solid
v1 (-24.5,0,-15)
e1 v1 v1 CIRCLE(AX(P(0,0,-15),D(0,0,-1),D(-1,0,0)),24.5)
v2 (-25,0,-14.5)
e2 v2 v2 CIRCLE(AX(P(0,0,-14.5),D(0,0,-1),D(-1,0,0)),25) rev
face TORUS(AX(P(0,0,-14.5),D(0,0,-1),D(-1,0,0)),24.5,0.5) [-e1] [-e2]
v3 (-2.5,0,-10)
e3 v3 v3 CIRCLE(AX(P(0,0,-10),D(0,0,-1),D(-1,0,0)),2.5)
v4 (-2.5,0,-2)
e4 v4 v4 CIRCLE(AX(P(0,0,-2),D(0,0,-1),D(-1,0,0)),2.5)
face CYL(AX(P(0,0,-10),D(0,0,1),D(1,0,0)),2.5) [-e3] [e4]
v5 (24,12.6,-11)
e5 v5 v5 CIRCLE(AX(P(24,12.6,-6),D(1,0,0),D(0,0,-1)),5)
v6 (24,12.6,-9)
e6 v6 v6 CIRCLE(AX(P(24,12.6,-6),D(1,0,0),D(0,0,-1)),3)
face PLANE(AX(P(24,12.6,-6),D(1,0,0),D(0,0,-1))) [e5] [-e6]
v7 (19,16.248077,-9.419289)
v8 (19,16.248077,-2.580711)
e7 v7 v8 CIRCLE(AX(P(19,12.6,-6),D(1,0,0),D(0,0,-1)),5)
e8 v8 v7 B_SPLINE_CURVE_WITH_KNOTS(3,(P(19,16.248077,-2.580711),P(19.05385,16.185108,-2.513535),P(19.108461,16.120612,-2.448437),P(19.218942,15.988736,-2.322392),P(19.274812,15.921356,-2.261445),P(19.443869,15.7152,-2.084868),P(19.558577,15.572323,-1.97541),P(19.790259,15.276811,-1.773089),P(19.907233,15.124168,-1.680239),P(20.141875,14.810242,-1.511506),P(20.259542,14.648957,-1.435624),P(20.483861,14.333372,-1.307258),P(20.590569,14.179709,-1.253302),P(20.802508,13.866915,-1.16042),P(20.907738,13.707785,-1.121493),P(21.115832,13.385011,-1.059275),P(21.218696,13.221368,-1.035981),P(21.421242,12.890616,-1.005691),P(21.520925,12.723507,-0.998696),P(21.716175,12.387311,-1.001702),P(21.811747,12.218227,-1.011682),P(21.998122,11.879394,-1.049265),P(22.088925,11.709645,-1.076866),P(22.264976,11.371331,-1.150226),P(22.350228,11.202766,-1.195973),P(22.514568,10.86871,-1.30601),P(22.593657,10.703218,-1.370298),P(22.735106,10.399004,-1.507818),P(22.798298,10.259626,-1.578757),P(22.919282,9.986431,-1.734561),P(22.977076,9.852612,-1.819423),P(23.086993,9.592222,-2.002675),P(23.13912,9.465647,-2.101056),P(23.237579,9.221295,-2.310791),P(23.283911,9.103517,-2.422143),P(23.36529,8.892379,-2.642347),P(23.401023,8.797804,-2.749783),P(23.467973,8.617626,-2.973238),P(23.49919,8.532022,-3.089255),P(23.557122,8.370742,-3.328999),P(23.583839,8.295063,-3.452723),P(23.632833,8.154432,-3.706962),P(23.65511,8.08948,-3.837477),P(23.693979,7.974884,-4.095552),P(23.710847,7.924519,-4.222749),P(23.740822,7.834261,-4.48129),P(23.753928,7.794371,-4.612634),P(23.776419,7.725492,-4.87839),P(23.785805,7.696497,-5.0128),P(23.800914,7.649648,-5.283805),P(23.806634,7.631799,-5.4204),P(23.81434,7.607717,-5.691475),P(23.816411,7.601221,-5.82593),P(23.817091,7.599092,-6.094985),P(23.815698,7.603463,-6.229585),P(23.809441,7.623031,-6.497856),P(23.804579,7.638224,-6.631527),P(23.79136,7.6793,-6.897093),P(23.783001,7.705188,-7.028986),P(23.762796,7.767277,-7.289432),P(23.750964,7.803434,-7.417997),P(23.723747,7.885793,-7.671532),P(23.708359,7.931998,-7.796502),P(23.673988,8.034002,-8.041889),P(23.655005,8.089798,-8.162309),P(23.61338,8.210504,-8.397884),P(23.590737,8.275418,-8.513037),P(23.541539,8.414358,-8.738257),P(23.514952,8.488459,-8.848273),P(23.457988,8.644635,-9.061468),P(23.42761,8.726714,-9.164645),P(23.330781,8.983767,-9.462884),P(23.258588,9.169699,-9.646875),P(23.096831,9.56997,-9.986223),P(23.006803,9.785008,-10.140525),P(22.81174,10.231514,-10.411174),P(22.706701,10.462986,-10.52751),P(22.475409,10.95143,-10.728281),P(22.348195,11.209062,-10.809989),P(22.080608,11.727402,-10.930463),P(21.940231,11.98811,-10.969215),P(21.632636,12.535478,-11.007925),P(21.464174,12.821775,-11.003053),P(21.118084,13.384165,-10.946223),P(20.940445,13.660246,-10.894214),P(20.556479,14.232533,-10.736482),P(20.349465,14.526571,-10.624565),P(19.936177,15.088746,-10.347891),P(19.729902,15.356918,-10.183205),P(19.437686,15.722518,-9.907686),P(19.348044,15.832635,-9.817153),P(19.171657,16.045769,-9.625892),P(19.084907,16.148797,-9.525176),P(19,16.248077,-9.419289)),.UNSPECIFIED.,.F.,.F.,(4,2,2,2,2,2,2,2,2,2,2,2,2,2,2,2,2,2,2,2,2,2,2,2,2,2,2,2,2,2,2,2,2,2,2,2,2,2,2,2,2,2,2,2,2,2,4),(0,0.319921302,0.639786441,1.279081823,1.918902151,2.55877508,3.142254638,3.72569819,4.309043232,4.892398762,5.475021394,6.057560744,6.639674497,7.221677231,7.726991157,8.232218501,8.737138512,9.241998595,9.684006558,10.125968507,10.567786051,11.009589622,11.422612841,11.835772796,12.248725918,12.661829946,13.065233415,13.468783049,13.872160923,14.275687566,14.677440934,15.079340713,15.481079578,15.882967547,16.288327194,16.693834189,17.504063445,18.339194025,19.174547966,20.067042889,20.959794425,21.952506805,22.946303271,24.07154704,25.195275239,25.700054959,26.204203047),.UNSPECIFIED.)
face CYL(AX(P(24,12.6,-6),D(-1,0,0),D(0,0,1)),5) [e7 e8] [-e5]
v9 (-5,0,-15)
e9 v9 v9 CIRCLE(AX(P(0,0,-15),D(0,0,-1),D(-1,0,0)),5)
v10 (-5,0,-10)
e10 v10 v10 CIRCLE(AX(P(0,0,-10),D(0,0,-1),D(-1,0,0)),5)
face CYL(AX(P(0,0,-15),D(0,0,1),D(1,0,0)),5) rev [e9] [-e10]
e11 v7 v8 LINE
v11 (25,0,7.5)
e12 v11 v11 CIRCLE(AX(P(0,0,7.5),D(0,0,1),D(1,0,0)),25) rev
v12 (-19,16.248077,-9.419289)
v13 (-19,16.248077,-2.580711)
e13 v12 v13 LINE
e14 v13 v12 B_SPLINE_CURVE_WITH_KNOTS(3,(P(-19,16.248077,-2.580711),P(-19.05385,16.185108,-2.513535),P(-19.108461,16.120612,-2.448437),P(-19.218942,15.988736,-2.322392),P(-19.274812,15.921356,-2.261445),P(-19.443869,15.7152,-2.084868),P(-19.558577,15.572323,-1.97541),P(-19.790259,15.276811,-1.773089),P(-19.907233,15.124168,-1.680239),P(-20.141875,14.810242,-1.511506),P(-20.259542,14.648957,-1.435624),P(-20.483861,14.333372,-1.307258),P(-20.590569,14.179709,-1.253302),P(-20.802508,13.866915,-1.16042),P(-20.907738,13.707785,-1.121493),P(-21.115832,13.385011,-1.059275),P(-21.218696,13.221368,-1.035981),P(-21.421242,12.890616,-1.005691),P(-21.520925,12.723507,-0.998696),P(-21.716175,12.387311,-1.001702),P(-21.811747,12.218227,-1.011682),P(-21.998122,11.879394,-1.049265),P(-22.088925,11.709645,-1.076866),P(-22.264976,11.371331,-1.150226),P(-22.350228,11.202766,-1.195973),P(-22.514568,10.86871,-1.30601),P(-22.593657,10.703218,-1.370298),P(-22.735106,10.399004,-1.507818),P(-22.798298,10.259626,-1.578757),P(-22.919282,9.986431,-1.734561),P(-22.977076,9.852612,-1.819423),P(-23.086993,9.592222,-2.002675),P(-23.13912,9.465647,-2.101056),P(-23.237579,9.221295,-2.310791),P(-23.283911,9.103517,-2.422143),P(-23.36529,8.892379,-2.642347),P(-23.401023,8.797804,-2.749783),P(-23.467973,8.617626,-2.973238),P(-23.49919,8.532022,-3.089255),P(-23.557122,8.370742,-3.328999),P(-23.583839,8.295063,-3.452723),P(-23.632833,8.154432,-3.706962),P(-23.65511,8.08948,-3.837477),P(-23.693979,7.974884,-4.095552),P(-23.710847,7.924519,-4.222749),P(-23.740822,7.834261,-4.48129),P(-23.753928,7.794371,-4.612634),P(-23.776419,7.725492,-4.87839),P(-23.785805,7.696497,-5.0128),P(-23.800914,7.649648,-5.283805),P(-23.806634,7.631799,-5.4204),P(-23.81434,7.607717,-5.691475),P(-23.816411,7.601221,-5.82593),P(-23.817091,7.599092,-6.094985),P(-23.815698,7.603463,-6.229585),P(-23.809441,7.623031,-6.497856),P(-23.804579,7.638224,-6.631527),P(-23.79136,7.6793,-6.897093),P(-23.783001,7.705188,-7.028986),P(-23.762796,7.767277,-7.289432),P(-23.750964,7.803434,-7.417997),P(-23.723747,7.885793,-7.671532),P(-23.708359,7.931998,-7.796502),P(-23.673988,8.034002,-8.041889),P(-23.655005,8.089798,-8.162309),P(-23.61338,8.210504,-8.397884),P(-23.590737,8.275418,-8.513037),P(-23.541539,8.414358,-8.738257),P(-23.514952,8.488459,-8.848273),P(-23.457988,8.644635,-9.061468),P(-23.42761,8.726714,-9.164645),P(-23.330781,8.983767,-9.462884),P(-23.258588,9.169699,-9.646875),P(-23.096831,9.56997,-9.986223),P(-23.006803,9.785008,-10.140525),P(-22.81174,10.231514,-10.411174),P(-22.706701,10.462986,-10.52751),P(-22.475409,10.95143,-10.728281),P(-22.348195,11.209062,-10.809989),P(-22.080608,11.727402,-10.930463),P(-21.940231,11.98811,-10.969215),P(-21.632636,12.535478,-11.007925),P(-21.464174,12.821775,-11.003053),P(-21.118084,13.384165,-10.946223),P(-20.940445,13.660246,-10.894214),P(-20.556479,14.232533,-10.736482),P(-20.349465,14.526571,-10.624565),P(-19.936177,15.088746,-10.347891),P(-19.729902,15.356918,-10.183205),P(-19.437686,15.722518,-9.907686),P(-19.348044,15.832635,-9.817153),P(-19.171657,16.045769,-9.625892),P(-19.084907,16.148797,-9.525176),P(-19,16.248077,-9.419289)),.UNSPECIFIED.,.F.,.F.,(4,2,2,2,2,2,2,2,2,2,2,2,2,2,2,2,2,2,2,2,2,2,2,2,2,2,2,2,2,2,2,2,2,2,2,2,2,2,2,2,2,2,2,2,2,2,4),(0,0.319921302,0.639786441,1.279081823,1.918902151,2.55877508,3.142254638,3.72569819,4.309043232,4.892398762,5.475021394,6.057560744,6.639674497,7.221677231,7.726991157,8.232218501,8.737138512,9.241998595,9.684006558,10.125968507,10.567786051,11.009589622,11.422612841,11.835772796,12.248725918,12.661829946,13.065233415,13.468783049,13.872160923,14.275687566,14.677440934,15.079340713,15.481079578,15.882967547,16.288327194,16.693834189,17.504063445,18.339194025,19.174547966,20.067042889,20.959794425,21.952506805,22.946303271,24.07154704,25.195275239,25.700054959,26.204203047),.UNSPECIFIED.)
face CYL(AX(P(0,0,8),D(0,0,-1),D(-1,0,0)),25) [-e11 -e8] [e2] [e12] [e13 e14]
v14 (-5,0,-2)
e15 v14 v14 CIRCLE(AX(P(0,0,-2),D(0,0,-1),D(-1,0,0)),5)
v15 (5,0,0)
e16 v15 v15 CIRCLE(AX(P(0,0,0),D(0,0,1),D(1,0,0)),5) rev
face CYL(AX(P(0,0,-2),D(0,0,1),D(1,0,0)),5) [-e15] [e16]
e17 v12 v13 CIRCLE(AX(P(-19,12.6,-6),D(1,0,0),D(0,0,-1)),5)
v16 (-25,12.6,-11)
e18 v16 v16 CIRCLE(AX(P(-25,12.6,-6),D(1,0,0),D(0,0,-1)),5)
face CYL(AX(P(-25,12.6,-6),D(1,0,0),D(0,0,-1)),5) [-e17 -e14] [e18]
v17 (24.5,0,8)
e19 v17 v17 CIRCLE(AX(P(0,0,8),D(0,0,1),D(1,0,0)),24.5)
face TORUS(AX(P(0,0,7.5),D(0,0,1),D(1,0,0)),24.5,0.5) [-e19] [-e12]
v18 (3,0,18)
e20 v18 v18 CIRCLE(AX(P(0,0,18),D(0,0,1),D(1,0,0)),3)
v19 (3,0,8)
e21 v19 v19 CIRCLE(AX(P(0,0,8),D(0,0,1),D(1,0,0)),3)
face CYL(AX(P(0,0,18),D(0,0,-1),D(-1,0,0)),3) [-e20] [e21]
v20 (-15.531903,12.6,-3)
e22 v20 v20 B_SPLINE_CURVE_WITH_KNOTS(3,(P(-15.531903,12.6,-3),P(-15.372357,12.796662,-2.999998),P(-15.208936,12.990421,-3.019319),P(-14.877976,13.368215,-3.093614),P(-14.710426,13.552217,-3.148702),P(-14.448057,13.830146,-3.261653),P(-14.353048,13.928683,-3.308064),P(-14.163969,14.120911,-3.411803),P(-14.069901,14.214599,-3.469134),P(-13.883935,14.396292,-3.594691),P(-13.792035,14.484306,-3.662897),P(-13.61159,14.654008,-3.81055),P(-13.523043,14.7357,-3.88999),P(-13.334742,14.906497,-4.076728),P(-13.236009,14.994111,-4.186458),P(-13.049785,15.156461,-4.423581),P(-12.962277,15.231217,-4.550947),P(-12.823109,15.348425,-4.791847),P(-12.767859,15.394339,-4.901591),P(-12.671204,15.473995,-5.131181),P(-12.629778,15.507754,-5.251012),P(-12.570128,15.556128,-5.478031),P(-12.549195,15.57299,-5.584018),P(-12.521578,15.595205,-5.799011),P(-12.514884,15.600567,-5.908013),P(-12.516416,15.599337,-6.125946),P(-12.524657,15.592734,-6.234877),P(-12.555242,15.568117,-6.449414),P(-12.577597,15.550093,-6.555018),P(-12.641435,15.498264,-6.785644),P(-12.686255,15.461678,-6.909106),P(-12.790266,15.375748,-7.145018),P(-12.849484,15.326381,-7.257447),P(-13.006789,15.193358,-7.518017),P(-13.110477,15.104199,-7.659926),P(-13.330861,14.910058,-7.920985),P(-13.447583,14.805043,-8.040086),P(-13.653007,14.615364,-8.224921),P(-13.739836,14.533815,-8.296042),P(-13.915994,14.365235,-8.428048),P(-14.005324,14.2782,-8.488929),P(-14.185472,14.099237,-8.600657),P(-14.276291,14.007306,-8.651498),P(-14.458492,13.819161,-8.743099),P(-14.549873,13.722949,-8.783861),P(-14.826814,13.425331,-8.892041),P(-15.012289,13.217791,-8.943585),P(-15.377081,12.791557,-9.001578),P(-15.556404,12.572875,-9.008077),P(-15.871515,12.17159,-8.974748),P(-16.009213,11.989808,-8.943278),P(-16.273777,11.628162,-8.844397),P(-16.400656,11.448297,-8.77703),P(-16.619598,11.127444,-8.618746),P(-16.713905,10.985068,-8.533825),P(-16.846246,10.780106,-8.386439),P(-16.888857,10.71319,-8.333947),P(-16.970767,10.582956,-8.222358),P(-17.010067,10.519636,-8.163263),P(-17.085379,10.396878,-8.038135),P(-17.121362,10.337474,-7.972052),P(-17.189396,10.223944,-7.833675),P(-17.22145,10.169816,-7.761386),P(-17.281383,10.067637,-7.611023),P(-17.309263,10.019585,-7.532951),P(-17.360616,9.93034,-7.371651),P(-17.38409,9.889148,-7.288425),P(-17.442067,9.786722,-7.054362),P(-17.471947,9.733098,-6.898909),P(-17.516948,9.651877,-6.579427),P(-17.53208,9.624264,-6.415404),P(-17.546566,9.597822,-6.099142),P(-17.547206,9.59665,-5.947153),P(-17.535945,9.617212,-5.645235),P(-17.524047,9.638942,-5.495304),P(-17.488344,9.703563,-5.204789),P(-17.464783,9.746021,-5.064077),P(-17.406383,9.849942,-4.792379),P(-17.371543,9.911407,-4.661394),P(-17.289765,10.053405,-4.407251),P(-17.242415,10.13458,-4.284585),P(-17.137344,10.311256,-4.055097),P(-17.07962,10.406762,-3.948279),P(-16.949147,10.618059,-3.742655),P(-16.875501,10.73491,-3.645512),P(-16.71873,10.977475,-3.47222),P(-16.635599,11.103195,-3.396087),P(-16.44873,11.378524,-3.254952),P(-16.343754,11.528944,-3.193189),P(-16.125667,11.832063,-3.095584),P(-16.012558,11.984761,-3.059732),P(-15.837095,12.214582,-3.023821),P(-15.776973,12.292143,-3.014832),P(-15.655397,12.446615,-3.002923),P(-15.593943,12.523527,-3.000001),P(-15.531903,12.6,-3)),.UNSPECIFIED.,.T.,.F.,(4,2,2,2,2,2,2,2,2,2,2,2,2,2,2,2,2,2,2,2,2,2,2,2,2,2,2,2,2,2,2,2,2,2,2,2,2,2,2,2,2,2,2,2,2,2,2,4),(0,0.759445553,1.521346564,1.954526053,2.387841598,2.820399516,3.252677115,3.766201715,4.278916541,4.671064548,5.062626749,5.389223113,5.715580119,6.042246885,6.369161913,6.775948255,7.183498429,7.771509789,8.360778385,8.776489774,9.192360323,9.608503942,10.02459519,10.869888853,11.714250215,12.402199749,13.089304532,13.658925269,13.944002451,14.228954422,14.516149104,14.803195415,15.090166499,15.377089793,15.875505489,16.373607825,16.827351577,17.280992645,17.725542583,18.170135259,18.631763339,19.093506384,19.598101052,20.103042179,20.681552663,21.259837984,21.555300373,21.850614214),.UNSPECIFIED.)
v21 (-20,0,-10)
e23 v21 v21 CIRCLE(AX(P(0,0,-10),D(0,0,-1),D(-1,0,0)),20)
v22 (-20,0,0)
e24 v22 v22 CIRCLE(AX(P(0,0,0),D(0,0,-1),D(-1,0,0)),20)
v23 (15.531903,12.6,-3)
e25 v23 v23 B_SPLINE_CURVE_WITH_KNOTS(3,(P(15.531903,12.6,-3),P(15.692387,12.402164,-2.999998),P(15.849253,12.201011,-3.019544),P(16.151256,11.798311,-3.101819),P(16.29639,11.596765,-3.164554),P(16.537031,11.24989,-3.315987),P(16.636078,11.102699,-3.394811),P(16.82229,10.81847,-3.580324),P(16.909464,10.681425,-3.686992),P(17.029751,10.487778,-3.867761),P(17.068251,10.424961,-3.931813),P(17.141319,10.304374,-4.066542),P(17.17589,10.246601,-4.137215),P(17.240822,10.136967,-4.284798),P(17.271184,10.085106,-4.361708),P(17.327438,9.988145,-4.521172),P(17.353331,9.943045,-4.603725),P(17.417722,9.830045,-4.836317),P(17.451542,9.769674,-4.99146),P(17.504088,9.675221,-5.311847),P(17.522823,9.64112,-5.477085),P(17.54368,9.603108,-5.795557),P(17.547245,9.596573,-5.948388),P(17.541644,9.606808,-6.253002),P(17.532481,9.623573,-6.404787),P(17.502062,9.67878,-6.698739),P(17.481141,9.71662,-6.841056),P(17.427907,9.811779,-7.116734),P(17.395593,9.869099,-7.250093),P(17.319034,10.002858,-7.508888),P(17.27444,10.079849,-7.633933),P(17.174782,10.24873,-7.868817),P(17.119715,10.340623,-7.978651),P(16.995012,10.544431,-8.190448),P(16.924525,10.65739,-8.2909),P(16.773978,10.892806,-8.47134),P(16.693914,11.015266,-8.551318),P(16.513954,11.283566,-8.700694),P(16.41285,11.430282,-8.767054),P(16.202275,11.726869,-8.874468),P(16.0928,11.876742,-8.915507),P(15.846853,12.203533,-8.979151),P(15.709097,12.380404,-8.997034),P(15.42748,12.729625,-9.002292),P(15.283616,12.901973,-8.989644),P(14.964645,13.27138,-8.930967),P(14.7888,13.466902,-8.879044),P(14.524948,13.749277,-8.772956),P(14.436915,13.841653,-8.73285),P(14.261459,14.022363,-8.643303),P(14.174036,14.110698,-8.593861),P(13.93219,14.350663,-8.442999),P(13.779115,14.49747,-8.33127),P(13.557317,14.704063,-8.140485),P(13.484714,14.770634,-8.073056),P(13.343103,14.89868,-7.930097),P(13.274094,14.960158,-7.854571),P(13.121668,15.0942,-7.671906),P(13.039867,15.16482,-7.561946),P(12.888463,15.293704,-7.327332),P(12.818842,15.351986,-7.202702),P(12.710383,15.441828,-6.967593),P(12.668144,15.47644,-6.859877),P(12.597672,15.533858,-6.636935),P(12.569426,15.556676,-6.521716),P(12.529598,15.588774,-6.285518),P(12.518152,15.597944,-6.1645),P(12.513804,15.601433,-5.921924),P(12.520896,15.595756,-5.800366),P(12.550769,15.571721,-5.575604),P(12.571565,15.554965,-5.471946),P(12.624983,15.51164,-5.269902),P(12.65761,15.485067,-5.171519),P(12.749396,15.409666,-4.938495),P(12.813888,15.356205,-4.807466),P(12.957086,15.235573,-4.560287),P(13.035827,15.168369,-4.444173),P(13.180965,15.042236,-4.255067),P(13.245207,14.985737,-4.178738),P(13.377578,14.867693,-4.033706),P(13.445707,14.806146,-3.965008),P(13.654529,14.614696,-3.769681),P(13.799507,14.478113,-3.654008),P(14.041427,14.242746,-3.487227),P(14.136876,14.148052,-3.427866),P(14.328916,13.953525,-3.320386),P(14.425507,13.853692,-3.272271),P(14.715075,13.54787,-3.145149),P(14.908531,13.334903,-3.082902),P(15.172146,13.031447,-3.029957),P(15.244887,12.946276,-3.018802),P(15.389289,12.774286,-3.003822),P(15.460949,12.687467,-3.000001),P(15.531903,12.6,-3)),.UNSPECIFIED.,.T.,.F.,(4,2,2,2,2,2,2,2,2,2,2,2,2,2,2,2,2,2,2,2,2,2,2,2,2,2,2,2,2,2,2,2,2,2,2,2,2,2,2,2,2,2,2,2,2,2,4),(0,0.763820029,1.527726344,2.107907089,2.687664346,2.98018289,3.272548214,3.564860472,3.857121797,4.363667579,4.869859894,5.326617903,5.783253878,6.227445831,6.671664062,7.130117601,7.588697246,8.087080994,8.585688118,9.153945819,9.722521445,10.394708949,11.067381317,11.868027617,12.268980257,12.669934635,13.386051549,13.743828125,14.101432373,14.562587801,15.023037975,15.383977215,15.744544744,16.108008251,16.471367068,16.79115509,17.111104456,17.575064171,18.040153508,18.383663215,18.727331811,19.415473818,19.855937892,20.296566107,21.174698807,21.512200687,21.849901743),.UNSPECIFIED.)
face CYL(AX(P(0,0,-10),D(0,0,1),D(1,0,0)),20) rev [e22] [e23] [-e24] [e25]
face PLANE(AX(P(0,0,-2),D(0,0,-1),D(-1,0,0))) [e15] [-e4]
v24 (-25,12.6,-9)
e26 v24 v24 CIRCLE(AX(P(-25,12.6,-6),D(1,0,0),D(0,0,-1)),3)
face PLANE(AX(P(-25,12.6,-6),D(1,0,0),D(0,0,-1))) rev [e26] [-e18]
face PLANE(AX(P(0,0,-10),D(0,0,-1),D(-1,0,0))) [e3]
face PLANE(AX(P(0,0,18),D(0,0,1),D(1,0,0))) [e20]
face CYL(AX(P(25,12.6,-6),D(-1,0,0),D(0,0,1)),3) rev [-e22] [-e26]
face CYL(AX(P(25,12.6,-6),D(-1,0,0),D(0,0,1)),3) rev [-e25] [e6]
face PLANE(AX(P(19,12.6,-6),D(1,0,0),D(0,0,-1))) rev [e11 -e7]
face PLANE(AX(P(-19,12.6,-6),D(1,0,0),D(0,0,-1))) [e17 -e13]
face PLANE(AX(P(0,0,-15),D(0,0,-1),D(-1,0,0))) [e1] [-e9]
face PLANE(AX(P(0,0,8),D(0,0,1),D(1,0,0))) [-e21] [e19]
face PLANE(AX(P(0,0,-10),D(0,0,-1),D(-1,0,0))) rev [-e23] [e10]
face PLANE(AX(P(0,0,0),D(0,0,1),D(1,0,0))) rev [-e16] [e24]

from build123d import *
from build123d.topology import SkipClean

# Parameters (mm, degrees)
SKETCH_1_R               = 25
EXTRUDE_1_DEPTH          = 8
SKETCH_2_R               = 3
EXTRUDE_2_DEPTH          = 10
EXTRUDE_START            = 10
SKETCH_3_R               = 25
SKETCH_3_R_2             = 20
EXTRUDE_3_DEPTH          = 10
SKETCH_4_R               = 5
EXTRUDE_4_DEPTH          = 2
SKETCH_5_R               = 2.5
EXTRUDE_5_DEPTH          = 8
EXTRUDE_START_2          = 5
SKETCH_6_R               = 25
SKETCH_6_R_2             = 5
EXTRUDE_6_DEPTH          = 5
CUT_EXTRUDE_1_DEPTH      = 40.67366885
CUT_EXTRUDE_1_DEPTH_BACK = 40.67366885
SKETCH_8_R               = 3
SKETCH_9_R               = 5
SKETCH_9_R_2             = 3
EXTRUDE_7_DEPTH          = 6
SKETCH_10_R              = 5
EXTRUDE_8_DEPTH          = 5
SKETCH_11_R              = 3
CUT_EXTRUDE_2_DEPTH      = 5
FILLET_1_R               = 0.5


with BuildPart() as part:
    # 草图1 → 凸台-拉伸1 (new body)
    with BuildSketch(Plane.XY):
        Circle(SKETCH_1_R)
    extrude(amount=EXTRUDE_1_DEPTH)

    # 草图2 → 凸台-拉伸2 (add)
    with BuildSketch(Plane.XY.offset(8)):
        Circle(SKETCH_2_R)
    extrude(amount=EXTRUDE_2_DEPTH)

    # 草图3 → 凸台-拉伸3 (add)
    with BuildSketch(Plane(origin=(0, 0, 0), x_dir=(-1, 0, 0), z_dir=(0, 0, -1)).offset(EXTRUDE_START)):
        Circle(SKETCH_3_R)
        Circle(SKETCH_3_R_2, mode=Mode.SUBTRACT)
    extrude(amount=-EXTRUDE_3_DEPTH)

    # 草图4 → 凸台-拉伸4 (add)
    with BuildSketch(Plane(origin=(0, 0, 0), x_dir=(-1, 0, 0), z_dir=(0, 0, -1))):
        with Locations(Location((0, 0, 0), (0, 0, 180))):
            Circle(SKETCH_4_R)
    extrude(amount=EXTRUDE_4_DEPTH)

    # 草图5 → 凸台-拉伸5 (add)
    with BuildSketch(Plane(origin=(0, 0, -2), x_dir=(-1, 0, 0), z_dir=(0, 0, -1))):
        Circle(SKETCH_5_R)
    extrude(amount=EXTRUDE_5_DEPTH)

    # 草图6 → 凸台-拉伸6 (add)
    with BuildSketch(Plane(origin=(0, 0, -10), x_dir=(-1, 0, 0), z_dir=(0, 0, -1)).offset(EXTRUDE_START_2)):
        Circle(SKETCH_6_R)
        with Locations(Location((0, 0, 0), (0, 0, 180))):
            Circle(SKETCH_6_R_2, mode=Mode.SUBTRACT)
    extrude(amount=-EXTRUDE_6_DEPTH)

    # 草图8 → 切除-拉伸1 (cut, two sides: drawn at the far end of the back side and taken through both)
    with BuildSketch(Plane(origin=(0, 0, 0), x_dir=(0, 0, -1), z_dir=(1, 0, 0)).offset(-CUT_EXTRUDE_1_DEPTH_BACK)):
        with Locations(Location((6, 12.6, 0), (0, 0, 180))):
            Circle(SKETCH_8_R)
    extrude(amount=CUT_EXTRUDE_1_DEPTH + CUT_EXTRUDE_1_DEPTH_BACK, mode=Mode.SUBTRACT)

    # 草图9 → 凸台-拉伸7 (add, through all)
    with SkipClean():  # the faces are left unmerged after this step: merging them gives an invalid solid
        with BuildSketch(Plane(origin=(-19, 0, 0), x_dir=(0, 0, -1), z_dir=(1, 0, 0))):
            with Locations((6, 12.6)):
                Circle(SKETCH_9_R)
            with Locations(Location((6, 12.6, 0), (0, 0, 180))):
                Circle(SKETCH_9_R_2, mode=Mode.SUBTRACT)
        extrude(amount=-EXTRUDE_7_DEPTH)

    # 草图10 → 凸台-拉伸8 (add)
    with BuildSketch(Plane(origin=(19, 0, 0), x_dir=(0, 0, -1), z_dir=(1, 0, 0)).offset(EXTRUDE_START_2)):
        with Locations((6, 12.6)):
            Circle(SKETCH_10_R)
    extrude(amount=-EXTRUDE_8_DEPTH)

    # 草图11 → 切除-拉伸2 (cut)
    with BuildSketch(Plane(origin=(24, 0, 0), x_dir=(0, 0, -1), z_dir=(1, 0, 0))):
        with Locations(Location((6, 12.6, 0), (0, 0, 180))):
            Circle(SKETCH_11_R)
    extrude(amount=-CUT_EXTRUDE_2_DEPTH, mode=Mode.SUBTRACT)

    # 圆角1
    fillet_1_edges = [part.edges().sort_by_distance(p)[0] for p in [
        (25, 0, -15),
        (-25, 0, 8),
    ]]
    fillet(fillet_1_edges, radius=FILLET_1_R)


solid = part.part
